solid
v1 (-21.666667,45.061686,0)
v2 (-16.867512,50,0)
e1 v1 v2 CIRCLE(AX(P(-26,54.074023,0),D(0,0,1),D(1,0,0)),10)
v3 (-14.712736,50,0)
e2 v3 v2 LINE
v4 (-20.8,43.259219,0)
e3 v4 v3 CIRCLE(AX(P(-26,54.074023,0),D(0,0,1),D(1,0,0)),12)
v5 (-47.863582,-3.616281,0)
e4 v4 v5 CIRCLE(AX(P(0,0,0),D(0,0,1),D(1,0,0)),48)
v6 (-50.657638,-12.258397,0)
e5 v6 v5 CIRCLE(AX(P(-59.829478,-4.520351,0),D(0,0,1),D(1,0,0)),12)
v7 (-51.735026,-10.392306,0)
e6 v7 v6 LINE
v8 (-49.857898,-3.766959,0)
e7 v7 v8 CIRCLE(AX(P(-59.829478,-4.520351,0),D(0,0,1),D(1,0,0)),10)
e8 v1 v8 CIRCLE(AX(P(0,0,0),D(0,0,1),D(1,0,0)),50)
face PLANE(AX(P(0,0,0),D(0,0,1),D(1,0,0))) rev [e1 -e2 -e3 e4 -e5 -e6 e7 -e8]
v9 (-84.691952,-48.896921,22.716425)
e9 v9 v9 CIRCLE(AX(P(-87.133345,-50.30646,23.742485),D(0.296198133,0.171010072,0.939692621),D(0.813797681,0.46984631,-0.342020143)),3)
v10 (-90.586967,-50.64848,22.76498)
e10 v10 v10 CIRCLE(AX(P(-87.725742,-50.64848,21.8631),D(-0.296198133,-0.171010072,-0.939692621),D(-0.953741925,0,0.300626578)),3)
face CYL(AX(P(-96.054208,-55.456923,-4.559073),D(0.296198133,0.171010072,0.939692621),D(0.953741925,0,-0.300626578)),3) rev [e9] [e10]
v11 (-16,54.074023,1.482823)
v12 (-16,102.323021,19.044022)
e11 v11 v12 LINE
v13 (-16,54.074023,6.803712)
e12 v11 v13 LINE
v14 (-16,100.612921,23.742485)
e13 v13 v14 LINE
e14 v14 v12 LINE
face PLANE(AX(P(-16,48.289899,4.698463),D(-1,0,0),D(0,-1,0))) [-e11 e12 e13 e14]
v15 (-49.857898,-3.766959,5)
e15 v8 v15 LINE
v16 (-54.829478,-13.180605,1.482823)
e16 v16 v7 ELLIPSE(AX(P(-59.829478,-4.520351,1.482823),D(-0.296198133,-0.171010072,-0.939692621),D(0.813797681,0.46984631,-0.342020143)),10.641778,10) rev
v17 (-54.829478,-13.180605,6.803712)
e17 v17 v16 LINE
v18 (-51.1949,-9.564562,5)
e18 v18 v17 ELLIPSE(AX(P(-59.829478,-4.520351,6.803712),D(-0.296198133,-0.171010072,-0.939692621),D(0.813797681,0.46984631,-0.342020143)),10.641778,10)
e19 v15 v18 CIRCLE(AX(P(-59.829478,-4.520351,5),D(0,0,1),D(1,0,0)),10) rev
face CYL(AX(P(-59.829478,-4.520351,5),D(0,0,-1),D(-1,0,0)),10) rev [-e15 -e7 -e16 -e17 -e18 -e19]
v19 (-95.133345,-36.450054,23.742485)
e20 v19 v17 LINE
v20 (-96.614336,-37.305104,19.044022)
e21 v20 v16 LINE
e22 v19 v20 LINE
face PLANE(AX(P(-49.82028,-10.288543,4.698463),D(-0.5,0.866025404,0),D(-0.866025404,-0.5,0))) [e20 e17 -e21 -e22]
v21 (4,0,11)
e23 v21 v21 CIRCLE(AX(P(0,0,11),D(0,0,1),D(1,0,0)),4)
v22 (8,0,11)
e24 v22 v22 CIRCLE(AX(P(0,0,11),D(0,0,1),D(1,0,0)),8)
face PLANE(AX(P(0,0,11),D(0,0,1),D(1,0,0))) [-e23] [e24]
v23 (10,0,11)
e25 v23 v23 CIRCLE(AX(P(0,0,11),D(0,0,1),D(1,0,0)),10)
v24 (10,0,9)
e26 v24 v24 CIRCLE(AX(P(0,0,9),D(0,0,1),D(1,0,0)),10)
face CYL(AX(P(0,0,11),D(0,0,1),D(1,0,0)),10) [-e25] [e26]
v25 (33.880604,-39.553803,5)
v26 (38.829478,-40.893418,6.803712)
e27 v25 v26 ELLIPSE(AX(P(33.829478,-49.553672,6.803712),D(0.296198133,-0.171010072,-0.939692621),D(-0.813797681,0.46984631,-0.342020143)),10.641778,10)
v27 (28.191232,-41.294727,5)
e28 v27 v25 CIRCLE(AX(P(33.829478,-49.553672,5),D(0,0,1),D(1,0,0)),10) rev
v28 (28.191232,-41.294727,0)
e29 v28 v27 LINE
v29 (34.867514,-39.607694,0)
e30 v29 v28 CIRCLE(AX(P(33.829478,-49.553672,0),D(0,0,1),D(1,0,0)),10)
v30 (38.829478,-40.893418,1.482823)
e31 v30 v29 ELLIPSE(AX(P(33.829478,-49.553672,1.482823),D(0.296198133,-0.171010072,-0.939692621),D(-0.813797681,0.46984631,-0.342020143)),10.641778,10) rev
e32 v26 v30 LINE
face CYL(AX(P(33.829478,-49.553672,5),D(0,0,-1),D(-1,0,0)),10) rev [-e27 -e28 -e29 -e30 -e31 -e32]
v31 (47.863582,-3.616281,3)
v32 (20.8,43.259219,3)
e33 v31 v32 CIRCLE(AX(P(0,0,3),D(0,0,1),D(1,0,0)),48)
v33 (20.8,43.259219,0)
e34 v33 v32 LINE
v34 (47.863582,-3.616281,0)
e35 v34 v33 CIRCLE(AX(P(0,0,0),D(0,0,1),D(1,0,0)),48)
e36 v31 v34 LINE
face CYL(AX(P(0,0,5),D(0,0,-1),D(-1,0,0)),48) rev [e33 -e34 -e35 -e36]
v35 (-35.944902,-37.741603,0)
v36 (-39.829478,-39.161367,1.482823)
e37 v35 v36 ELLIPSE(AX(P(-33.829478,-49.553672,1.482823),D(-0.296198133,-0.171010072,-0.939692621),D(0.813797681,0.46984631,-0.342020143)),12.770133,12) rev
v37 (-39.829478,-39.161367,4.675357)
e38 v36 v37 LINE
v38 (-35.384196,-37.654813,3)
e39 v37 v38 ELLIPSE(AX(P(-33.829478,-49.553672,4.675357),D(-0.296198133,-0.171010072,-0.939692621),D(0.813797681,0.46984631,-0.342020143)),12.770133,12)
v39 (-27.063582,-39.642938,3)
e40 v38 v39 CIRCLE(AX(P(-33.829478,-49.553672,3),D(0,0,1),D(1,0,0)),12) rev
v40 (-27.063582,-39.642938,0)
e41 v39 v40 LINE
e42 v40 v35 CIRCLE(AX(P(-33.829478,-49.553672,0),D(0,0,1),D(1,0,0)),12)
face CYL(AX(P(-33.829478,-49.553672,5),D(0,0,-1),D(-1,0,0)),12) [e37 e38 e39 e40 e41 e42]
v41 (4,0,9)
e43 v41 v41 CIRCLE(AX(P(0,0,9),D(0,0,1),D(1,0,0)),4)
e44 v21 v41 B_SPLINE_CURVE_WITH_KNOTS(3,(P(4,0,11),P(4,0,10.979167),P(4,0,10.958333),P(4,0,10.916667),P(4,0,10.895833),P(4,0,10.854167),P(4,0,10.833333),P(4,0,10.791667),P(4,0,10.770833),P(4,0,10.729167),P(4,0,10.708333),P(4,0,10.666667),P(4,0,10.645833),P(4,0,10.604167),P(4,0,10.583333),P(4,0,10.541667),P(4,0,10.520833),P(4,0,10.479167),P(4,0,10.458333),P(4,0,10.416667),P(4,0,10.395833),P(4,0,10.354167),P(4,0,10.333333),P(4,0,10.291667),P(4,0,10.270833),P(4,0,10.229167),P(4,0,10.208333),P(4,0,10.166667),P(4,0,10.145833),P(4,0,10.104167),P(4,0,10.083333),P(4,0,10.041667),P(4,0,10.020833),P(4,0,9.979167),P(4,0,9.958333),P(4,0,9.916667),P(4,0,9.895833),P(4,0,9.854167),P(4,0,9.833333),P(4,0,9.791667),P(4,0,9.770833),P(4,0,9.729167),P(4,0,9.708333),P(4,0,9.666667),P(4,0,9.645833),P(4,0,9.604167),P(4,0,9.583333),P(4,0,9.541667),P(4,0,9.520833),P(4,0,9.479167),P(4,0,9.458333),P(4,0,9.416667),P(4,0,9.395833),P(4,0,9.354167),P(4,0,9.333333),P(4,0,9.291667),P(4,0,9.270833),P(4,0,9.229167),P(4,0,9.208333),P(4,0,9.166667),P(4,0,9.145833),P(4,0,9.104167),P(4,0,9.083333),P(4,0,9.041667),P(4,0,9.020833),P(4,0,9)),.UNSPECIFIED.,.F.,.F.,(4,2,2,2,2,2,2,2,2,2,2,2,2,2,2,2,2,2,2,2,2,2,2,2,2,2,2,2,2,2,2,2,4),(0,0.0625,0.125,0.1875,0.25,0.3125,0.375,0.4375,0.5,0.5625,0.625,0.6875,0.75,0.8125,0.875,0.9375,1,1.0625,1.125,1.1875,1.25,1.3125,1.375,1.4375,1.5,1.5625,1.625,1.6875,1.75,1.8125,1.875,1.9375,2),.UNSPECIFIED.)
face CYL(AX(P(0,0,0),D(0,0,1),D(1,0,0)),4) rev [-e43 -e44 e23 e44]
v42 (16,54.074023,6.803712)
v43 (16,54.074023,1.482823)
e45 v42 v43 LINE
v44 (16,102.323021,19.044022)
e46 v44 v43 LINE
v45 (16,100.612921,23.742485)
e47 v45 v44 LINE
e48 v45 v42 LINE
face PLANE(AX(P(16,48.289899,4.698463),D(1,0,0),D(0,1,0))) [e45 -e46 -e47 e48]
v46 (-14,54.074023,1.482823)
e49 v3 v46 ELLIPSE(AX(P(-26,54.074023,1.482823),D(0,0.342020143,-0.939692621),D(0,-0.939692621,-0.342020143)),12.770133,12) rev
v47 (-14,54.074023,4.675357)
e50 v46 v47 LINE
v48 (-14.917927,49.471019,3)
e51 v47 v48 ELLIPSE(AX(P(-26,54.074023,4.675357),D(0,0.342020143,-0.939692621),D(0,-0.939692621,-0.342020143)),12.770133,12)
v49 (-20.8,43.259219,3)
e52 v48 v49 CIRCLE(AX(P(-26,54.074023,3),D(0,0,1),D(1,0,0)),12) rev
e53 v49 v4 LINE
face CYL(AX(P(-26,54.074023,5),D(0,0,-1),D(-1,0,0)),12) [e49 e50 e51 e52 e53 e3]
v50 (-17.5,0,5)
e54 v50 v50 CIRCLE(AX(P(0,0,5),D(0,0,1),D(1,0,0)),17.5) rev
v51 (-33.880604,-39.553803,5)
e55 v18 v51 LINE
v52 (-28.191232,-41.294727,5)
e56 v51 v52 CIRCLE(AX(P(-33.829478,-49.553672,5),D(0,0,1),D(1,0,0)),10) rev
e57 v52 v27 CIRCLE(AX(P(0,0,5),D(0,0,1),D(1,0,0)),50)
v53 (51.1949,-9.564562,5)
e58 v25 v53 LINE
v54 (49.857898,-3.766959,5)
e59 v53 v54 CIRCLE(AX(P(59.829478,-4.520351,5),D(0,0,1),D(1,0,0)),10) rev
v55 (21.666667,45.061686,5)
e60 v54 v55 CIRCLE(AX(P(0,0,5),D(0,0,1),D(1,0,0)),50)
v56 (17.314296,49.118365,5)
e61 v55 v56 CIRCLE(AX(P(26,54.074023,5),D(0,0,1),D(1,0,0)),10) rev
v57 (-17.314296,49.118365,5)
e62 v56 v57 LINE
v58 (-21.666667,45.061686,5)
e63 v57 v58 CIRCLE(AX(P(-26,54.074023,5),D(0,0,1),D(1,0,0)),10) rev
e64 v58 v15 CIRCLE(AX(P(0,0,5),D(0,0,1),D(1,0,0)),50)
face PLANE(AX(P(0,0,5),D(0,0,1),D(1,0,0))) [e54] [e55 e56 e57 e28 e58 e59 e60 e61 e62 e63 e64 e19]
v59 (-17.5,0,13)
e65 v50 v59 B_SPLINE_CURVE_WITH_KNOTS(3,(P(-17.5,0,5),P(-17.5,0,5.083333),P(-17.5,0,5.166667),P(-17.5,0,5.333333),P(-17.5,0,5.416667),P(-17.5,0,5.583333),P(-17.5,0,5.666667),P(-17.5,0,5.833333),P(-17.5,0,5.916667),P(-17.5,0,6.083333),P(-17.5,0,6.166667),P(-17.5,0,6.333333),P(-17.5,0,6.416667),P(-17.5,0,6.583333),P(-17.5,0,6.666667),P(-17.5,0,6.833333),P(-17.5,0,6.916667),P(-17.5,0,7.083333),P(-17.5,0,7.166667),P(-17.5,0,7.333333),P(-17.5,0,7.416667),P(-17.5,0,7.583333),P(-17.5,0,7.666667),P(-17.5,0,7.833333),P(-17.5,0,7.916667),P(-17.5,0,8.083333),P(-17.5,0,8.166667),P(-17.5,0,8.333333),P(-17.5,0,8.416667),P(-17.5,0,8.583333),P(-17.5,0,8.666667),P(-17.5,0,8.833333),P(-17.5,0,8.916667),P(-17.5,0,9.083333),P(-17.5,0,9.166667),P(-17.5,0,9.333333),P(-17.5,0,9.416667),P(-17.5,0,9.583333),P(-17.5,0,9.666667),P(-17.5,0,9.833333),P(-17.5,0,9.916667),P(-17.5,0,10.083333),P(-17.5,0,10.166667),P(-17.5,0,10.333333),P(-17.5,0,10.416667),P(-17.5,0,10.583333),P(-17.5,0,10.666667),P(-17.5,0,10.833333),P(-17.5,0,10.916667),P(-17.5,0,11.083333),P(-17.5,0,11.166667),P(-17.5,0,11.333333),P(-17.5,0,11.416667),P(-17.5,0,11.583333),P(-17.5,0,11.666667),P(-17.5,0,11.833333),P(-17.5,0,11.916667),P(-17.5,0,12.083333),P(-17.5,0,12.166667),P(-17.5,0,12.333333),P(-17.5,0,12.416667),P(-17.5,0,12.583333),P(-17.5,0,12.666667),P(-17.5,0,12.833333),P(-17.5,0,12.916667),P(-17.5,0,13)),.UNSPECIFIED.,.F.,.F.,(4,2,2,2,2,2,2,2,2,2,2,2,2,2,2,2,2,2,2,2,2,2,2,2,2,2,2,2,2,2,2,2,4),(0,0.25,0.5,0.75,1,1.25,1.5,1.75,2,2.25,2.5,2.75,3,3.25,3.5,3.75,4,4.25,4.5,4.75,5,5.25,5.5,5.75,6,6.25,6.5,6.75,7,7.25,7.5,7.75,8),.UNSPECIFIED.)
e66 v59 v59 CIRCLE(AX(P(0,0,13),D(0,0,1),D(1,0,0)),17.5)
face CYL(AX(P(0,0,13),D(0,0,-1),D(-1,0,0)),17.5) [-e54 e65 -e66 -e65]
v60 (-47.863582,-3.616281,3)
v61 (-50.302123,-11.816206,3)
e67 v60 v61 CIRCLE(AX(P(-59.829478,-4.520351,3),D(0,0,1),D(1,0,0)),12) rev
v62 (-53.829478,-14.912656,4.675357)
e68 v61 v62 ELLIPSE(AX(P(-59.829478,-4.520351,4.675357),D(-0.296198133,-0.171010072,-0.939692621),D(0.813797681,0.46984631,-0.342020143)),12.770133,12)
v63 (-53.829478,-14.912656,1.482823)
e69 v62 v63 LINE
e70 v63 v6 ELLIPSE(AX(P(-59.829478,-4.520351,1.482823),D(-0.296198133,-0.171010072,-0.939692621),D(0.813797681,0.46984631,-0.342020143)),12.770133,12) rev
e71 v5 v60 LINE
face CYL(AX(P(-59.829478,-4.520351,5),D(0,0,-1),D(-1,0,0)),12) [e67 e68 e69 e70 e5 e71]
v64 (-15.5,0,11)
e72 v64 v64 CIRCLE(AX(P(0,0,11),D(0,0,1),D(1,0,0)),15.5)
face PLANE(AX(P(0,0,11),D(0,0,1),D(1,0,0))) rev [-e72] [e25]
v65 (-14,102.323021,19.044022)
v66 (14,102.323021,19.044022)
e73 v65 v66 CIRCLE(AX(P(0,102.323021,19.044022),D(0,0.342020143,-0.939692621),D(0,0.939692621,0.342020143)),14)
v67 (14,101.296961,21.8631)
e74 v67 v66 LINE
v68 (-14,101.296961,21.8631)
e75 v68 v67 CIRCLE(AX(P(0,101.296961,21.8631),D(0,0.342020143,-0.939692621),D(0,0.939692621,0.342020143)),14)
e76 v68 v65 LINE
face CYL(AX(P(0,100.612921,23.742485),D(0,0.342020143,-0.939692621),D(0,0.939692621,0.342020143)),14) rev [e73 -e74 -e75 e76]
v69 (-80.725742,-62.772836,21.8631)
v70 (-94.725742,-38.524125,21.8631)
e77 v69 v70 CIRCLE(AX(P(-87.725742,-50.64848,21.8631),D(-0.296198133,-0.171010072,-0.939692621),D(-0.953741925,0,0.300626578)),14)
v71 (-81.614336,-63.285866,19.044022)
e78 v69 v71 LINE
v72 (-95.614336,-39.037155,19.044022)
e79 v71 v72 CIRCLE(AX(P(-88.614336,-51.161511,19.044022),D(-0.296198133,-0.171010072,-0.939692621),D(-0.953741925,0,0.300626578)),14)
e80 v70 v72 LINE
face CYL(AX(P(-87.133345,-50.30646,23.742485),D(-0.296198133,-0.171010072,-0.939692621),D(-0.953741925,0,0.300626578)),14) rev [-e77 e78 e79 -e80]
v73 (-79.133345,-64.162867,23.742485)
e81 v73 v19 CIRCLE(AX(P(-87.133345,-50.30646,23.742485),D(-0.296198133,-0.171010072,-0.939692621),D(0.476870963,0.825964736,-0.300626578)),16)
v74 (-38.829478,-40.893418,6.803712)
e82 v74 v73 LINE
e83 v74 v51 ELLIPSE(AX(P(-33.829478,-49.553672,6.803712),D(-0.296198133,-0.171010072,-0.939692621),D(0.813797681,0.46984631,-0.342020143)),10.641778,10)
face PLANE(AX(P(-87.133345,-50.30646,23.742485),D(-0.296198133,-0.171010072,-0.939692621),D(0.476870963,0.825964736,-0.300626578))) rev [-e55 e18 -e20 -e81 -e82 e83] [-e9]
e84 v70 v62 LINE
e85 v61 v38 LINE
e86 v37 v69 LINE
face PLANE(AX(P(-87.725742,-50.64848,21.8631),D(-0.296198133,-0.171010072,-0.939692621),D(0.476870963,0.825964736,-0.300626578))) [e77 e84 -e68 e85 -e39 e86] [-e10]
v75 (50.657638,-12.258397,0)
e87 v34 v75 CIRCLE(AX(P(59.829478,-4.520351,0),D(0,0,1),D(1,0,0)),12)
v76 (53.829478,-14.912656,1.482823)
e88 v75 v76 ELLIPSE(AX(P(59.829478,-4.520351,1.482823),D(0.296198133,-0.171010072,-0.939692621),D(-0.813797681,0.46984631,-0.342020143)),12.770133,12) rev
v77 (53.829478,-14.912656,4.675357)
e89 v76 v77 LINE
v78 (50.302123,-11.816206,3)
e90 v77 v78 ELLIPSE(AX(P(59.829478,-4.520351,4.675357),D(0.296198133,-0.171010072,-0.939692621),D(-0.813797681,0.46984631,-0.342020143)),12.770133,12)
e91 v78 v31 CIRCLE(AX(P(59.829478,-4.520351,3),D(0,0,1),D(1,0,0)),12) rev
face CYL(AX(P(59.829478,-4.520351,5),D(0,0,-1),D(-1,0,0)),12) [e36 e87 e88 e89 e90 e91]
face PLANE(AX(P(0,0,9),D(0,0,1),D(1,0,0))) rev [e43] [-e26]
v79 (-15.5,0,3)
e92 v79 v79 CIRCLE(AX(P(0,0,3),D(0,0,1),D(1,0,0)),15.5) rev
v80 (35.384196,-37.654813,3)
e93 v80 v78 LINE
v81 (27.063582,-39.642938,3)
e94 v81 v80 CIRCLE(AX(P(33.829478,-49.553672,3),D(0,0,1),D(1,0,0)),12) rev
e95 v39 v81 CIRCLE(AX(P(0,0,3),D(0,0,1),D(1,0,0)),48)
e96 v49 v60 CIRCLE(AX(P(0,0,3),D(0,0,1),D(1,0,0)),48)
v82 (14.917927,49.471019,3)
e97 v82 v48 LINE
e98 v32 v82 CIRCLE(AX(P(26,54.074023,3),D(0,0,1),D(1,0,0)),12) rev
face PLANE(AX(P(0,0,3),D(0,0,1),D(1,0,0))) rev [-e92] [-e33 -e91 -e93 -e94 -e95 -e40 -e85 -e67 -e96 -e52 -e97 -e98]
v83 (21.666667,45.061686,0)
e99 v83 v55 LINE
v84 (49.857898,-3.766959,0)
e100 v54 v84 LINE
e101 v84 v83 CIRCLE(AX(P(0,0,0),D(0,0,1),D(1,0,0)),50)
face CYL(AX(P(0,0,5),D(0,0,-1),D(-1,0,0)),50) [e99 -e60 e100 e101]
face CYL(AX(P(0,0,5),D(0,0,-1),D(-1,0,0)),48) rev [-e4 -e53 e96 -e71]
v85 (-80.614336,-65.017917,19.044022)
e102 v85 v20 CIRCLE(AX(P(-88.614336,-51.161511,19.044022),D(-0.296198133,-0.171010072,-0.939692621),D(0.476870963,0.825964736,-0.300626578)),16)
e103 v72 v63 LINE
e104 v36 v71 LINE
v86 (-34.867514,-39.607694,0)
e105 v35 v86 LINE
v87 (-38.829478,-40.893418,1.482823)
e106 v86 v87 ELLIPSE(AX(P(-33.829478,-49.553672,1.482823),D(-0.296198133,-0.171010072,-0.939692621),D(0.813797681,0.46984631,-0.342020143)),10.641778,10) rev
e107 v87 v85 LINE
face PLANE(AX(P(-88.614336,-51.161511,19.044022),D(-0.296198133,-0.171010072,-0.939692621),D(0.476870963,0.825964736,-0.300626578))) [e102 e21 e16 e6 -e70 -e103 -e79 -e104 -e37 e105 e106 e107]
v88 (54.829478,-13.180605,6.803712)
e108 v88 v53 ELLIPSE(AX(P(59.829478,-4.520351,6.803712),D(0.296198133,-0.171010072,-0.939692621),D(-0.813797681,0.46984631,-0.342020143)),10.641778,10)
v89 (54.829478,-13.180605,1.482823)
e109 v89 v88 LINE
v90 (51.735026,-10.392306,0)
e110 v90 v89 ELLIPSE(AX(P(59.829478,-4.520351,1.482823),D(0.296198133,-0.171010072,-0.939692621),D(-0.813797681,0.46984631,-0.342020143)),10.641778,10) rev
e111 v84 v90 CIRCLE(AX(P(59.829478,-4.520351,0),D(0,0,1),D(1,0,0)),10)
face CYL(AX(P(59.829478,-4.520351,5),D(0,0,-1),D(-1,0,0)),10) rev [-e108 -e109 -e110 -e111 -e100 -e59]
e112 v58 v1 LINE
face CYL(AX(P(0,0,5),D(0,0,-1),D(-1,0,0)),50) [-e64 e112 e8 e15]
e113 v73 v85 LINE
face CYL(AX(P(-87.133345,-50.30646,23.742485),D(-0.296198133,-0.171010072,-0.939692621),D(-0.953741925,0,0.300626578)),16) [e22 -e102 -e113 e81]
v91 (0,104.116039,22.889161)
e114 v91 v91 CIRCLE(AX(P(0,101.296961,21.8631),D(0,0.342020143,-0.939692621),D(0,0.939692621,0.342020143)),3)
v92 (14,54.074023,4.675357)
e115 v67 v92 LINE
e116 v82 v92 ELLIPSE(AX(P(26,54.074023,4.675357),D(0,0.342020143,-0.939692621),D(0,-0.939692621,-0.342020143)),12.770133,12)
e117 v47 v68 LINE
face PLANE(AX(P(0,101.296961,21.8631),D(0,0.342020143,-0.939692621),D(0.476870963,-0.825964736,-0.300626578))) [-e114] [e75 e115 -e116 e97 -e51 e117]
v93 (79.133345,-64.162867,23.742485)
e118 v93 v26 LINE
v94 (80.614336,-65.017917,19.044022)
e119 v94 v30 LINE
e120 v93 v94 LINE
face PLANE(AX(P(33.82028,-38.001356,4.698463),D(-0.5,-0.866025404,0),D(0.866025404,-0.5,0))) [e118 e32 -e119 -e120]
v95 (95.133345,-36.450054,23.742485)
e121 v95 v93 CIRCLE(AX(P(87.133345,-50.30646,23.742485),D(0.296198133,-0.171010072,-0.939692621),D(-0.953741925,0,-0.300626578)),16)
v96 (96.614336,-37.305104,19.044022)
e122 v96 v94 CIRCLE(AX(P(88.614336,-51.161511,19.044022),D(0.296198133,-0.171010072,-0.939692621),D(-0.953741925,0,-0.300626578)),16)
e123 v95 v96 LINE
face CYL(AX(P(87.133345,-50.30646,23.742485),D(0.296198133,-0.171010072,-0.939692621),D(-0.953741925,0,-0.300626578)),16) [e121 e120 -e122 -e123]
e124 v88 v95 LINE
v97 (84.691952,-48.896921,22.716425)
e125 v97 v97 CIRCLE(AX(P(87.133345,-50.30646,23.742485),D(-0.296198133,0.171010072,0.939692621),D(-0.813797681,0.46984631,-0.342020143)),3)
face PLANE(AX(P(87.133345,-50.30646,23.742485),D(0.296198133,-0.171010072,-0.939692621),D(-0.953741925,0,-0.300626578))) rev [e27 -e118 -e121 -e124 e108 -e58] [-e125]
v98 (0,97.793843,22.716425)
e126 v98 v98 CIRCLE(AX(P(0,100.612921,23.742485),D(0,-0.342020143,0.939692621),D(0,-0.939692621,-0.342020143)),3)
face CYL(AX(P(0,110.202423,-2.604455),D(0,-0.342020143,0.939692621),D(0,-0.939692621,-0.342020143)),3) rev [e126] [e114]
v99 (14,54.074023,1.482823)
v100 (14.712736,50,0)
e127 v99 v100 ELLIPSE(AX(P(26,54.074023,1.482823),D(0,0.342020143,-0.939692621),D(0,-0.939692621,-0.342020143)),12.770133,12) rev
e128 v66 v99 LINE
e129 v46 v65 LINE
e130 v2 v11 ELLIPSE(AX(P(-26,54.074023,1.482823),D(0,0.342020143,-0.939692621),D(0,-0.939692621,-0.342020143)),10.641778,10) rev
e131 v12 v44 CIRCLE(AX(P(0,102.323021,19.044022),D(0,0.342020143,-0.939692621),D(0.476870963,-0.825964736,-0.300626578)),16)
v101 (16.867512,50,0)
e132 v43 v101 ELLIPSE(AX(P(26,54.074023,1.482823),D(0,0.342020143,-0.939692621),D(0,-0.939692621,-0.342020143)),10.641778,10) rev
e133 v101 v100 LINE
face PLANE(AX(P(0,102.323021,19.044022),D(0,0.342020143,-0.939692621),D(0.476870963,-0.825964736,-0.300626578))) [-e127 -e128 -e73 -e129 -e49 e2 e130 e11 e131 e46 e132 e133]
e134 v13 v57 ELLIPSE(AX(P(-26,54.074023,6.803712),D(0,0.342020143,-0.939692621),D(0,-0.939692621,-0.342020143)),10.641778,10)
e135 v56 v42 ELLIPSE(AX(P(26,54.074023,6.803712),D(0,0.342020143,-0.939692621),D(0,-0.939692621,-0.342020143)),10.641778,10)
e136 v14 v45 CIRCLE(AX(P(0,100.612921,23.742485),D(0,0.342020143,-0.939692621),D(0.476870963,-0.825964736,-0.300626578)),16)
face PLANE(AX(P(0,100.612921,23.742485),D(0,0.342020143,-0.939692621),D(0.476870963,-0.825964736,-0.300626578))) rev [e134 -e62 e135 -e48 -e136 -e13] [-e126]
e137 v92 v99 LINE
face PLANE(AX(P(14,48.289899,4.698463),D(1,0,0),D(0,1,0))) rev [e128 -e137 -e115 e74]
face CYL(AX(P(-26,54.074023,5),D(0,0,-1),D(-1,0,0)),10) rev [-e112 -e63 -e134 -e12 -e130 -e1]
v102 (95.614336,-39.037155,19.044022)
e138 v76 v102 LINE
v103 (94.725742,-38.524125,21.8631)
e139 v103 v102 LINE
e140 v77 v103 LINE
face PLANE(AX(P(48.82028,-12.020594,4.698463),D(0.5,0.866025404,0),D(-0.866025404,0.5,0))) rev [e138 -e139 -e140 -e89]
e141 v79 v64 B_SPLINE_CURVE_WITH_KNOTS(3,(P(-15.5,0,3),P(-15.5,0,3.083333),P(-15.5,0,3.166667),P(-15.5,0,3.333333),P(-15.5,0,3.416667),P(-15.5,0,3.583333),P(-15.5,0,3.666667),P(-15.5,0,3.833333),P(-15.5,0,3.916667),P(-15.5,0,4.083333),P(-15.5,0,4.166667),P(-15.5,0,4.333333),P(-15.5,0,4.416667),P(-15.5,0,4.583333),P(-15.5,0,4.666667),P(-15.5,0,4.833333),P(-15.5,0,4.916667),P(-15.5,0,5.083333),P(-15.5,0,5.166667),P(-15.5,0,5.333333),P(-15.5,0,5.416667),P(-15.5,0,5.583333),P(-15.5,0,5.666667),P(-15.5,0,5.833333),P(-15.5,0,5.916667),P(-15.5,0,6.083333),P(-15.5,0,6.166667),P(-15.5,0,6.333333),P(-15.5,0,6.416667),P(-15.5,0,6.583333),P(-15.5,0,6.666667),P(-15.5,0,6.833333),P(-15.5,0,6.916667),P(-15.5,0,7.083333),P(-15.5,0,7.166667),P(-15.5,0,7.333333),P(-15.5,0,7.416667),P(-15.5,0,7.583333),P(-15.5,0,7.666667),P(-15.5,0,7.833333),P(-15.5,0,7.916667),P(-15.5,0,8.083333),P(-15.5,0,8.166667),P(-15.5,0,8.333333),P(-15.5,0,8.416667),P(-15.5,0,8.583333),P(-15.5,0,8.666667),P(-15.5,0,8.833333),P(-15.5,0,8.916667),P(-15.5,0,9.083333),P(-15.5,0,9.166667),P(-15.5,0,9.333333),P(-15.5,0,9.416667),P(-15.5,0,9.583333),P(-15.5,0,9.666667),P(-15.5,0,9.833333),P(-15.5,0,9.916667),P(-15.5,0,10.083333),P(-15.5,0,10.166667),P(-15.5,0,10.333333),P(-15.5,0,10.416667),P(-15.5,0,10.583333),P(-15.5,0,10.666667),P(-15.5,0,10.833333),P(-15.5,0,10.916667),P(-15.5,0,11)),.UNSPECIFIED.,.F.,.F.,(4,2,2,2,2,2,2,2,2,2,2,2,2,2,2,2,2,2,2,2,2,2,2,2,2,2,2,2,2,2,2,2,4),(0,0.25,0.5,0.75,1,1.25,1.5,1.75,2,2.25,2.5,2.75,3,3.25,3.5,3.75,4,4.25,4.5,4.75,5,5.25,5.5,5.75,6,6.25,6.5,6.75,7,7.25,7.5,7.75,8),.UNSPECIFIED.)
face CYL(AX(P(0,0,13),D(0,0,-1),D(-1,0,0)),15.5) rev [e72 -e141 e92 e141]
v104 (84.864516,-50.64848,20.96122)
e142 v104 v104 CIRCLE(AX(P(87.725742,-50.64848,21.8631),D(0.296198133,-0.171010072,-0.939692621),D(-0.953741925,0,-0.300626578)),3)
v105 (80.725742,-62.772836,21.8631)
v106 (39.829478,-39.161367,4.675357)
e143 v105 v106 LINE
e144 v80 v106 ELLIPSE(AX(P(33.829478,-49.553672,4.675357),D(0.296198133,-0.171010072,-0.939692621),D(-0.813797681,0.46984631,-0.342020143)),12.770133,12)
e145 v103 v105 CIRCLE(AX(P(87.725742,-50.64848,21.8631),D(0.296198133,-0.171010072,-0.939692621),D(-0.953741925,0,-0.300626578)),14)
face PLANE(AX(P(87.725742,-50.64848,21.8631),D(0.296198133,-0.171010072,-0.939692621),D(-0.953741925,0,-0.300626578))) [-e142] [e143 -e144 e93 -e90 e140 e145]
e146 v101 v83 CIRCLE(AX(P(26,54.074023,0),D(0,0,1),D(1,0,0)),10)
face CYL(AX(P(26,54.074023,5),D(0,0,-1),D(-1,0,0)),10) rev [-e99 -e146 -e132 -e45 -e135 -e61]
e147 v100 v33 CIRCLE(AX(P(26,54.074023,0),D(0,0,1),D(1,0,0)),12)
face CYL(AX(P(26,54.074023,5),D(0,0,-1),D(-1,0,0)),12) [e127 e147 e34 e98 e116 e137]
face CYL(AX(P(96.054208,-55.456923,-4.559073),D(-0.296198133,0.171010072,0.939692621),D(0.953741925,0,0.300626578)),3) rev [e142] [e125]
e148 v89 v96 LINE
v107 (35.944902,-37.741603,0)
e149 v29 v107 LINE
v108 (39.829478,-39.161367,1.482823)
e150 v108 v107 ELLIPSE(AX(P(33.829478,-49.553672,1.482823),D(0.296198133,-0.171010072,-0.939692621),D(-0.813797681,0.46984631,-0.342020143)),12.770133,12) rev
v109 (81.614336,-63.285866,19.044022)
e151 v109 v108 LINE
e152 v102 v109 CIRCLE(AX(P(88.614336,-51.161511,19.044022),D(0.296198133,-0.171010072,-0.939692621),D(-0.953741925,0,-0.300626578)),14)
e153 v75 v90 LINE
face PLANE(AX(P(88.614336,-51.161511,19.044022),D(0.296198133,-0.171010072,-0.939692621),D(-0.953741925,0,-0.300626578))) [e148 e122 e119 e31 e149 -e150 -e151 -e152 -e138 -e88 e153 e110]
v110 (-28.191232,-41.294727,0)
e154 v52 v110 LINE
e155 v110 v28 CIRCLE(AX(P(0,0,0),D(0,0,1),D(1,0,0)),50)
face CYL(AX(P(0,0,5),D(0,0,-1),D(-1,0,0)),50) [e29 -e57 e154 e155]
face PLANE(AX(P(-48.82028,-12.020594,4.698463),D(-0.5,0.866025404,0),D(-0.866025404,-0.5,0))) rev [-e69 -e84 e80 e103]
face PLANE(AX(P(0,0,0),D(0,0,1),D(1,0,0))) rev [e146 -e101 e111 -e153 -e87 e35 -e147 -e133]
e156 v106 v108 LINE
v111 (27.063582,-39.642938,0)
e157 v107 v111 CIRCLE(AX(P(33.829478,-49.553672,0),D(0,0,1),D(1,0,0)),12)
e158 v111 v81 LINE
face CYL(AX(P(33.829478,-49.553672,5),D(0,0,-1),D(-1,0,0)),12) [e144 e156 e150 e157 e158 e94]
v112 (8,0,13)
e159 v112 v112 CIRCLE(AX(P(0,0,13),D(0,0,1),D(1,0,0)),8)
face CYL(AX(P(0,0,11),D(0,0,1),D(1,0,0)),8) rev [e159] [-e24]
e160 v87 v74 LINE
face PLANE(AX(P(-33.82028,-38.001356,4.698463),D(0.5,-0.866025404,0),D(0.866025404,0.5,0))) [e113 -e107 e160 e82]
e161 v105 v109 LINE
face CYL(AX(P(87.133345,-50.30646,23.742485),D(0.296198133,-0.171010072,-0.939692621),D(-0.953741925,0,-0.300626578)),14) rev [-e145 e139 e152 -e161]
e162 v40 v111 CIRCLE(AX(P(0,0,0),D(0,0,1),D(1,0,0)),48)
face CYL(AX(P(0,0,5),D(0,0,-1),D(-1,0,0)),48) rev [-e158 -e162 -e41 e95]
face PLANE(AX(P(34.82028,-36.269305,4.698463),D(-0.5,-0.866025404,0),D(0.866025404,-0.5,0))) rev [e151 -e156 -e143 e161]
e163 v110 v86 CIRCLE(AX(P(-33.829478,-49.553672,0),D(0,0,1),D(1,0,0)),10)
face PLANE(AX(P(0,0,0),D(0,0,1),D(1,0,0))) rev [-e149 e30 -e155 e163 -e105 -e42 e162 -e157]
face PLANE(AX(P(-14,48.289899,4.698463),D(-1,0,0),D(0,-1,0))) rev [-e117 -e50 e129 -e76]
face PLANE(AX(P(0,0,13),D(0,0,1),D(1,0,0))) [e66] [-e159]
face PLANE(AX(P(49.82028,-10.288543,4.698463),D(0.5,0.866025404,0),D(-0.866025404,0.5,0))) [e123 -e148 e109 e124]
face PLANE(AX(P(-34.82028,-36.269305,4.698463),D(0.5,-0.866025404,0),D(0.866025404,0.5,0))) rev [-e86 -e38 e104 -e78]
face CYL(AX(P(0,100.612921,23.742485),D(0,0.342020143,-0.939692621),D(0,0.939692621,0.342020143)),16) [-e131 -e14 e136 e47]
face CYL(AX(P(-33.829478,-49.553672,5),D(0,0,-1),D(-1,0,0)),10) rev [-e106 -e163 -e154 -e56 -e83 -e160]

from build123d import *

# Parameters (mm, degrees)
SKETCH_1_R                       = 50
EXTRUDE_1_DEPTH                  = 5
SKETCH_1_3_R                     = 17.500000000000004
EXTRUDE_2_DEPTH                  = 13
SKETCH_2_R                       = 8
CUT_EXTRUDE_1_DEPTH              = 2
EXTRUDE_3_DEPTH                  = 5
EXTRUDE_5_REACH                  = 128.152
CUT_EXTRUDE_2_DEPTH              = 118.90068634817568
FILLET_5_R                       = 10
PATTERN_CIRCULAR_5_COUNT         = 3
FILLET_5_OF_PATTERN_CIRCULAR_5_R = 10
SHELL_1_T                        = -2
SKETCH_6_R                       = 3.000000000000001
CUT_EXTRUDE_3_DEPTH              = 159.93487100427444
PATTERN_CIRCULAR_6_COUNT         = 3
SKETCH_7_R                       = 4
CUT_EXTRUDE_4_DEPTH              = 158.79466820588078


with BuildPart() as part:
    # 草图1 → 凸台-拉伸1 (new body)
    with BuildSketch(Plane.XY):
        Circle(SKETCH_1_R)
    extrude(amount=EXTRUDE_1_DEPTH)

    # 草图1<3> → 凸台-拉伸2 (add)
    with BuildSketch(Plane.XY):
        with Locations(Location((0, 0, 0), (0, 0, 180))):
            Circle(SKETCH_1_3_R)
    extrude(amount=EXTRUDE_2_DEPTH)

    # 草图2 → 切除-拉伸1 (cut)
    with BuildSketch(Plane.XY.offset(13)):
        Circle(SKETCH_2_R)
    extrude(amount=-CUT_EXTRUDE_1_DEPTH, mode=Mode.SUBTRACT)

    # 草图3 → 凸台-拉伸3 (add)
    with BuildSketch(Plane(origin=(5.065286390387326, -2.9244444610127034, -16.069690242163254), x_dir=(-0.4547694655894244, 0.8399115425669119, -0.296198132726018), z_dir=(0.2961981327260181, -0.17101007166283297, -0.9396926207859104))):
        with BuildLine():
            Line((-48.68988406746872, 9.635909059096992), (-44.170713707432306, 7.026764835216193))
            Line((-44.170713707432306, 7.026764835216193), (-28.17071370743221, 34.73957775631811))
            Line((-28.17071370743221, 34.73957775631811), (-32.68988406746857, 37.348721980198945))
            Line((-32.68988406746857, 37.348721980198945), (-80.91104144309439, 65.18922017165217))
            ThreePointArc((-80.91104144309439, 65.18922017165217), (-102.76744790364546, 59.33281371110126), (-96.91104144309453, 37.47640725055021))
            Line((-96.91104144309453, 37.47640725055021), (-48.68988406746872, 9.635909059096992))
        make_face()
    extrude_3 = extrude(amount=-EXTRUDE_3_DEPTH)

    # 凸台-拉伸5: up to this face of the body (flat: up to its plane)
    extrude_5_end = Plane(part.part.faces().sort_by_distance((41.313007094, -23.852075767, 5))[0])
    # 草图3<3> → 凸台-拉伸5 (add, up to the picked face)
    with BuildSketch(Plane(origin=(5.065286390387326, -2.9244444610127034, -16.069690242163254), x_dir=(-0.4547694655894244, 0.8399115425669119, -0.296198132726018), z_dir=(0.2961981327260181, -0.17101007166283297, -0.9396926207859104)), mode=Mode.PRIVATE) as extrude_5_sk1:
        with BuildLine():
            Line((-48.68988406746872, 9.635909059096992), (-44.170713707432306, 7.026764835216193))
            Line((-44.170713707432306, 7.026764835216193), (-28.17071370743221, 34.73957775631811))
            Line((-28.17071370743221, 34.73957775631811), (-32.68988406746857, 37.348721980198945))
            Line((-32.68988406746857, 37.348721980198945), (-80.91104144309439, 65.18922017165217))
            ThreePointArc((-80.91104144309439, 65.18922017165217), (-102.76744790364546, 59.33281371110126), (-96.91104144309453, 37.47640725055021))
            Line((-96.91104144309453, 37.47640725055021), (-48.68988406746872, 9.635909059096992))
        make_face()
    extrude_5_tool1 = split(extrude(extrude_5_sk1.sketch, amount=-EXTRUDE_5_REACH, mode=Mode.PRIVATE), bisect_by=extrude_5_end, keep=Keep.BOTH, mode=Mode.PRIVATE)
    extrude_5 = extrude_5_tool1.solids().sort_by(Axis((69.018363, -39.847771, 10.808293), (-0.2961981327260181, 0.17101007166283297, 0.9396926207859104)))[0]
    add(extrude_5)

    # 草图5 → 切除-拉伸2 (cut, through all)
    with BuildSketch(Plane(origin=(38.49206954203913, -22.223406711762383, -1.6037e-13), x_dir=(-3.05e-15, 1.78e-15, -1), z_dir=(0.8660254037844358, -0.5000000000000049, -3.5322521134775243e-15))):
        Polygon((-1.648e-13, 16.000000000000025), (-1.5959e-13, -15.999999999999938), (1.784759762817917, -15.999999999999941), (1.7847597628179104, 16.00000000000001), align=None)
    cut_extrude_2 = extrude(amount=CUT_EXTRUDE_2_DEPTH, mode=Mode.SUBTRACT)

    # 圆角5
    # the kernel refuses this fillet: 10 mm, written as the material it adds along each edge
    with BuildSketch(Plane(origin=(49.02438299353199, -9.829032104103193, 21.757865522686952), x_dir=(0.13621517176222497, 0.9906792755386516, 2.0677653492524378e-13), z_dir=(-1.421e-14, 2.1068e-13, -1))) as fillet_5_piece_1_section:
        with BuildLine():
            CenterArc((6.731018039103729, 9.981260704815702), FILLET_5_R, 202.17110675219934, 64.32071138054346)
            Line((-2.5295920158997607, 6.207522318391934), (0, 0))
            ThreePointArc((0, 0), (3.059553654138056, 0.09369647592149925), (6.119107308276114, -4e-17))
        make_face()
    fillet_5_piece_1 = extrude(amount=21.757865522686952, mode=Mode.PRIVATE)
    fillet_5_piece_1 = split(fillet_5_piece_1, bisect_by=Plane(origin=(52.84730831811883, -11.940665679476957, 5), z_dir=(0, 0, 1)), keep=Keep.TOP, mode=Mode.PRIVATE)
    fillet_5_piece_1 = split(fillet_5_piece_1, bisect_by=Plane(origin=(52.714644452393756, -11.864072160888846, 5.897511373073815), z_dir=(0.2961981327260181, -0.17101007166283302, -0.9396926207859104)), keep=Keep.TOP, mode=Mode.PRIVATE)
    add(fillet_5_piece_1)
    with BuildSketch(Plane(origin=(49.02438299353206, -9.829032104104291, 5), x_dir=(0.13621517176219033, 0.9906792755386564, 2.067765349252453e-13), z_dir=(-1.421e-14, 2.1068e-13, -1))) as fillet_5_piece_2_section:
        with BuildLine():
            CenterArc((6.731018039104405, 9.981260704815725), FILLET_5_R, 202.17110675220147, 64.32071138054334)
            Line((-2.5295920158989453, 6.20752231839161), (0, 0))
            ThreePointArc((0, 0), (3.059553654138554, 0.09369647592138662), (6.119107308277147, 7e-17))
        make_face()
    fillet_5_piece_2 = extrude(amount=5, mode=Mode.PRIVATE)
    fillet_5_piece_2 = split(fillet_5_piece_2, bisect_by=Plane(origin=(49.82758960271088, -7.64578575322723, 4.219824774764975), z_dir=(-0.2961981327260181, 0.17101007166283302, 0.9396926207859104)), keep=Keep.TOP, mode=Mode.PRIVATE)
    add(fillet_5_piece_2)
    with BuildSketch(Plane(origin=(49.02438299353206, -9.829032104104291, 5), x_dir=(0.13621517176219033, 0.9906792755386564, 2.067765349252453e-13), z_dir=(-1.421e-14, 2.1068e-13, -1))) as fillet_5_piece_3_section:
        with BuildLine():
            CenterArc((6.731018039104405, 9.981260704815725), FILLET_5_R, 202.17110675220147, 64.32071138054334)
            Line((-2.5295920158989453, 6.20752231839161), (0, 0))
            ThreePointArc((0, 0), (3.059553654138554, 0.09369647592138662), (6.119107308277147, 7e-17))
        make_face()
    fillet_5_piece_3 = extrude(amount=5, mode=Mode.PRIVATE)
    fillet_5_piece_3 = split(fillet_5_piece_3, bisect_by=Plane(origin=(51.376248958655296, -9.84493274720883, -0.2127030682430071), z_dir=(-0.2961981327260181, 0.17101007166283302, 0.9396926207859104)), keep=Keep.TOP, mode=Mode.PRIVATE)
    fillet_5_piece_3 = split(fillet_5_piece_3, bisect_by=Plane(origin=(49.8952582950252, -8.98988238889466, 4.485760035686546), z_dir=(0.2961981327260181, -0.17101007166283302, -0.9396926207859104)), keep=Keep.TOP, mode=Mode.PRIVATE)
    add(fillet_5_piece_3)
    with BuildSketch(Plane(origin=(33.02438299353184, -37.54184502520521, 0), x_dir=(-0.7898458337381293, -0.6133054368962657, 7.566603122460955e-14), z_dir=(6.821e-14, 3.553e-14, 1))) as fillet_5_piece_4_section:
        with BuildLine():
            CenterArc((6.731018039103674, 9.981260704815702), FILLET_5_R, 202.17110675219942, 64.32071138054346)
            Line((-2.529592015899812, 6.20752231839192), (0, 0))
            ThreePointArc((0, 0), (3.059553654138055, 0.0936964759214936), (6.119107308276071, -1.7e-16))
        make_face()
    fillet_5_piece_4 = extrude(amount=5, mode=Mode.PRIVATE)
    fillet_5_piece_4 = split(fillet_5_piece_4, bisect_by=Plane(origin=(32.73309567333404, -38.71562001742838, 4.485760035687541), z_dir=(0.2961981327260181, -0.17101007166283302, -0.9396926207859104)), keep=Keep.TOP, mode=Mode.PRIVATE)
    fillet_5_piece_4 = split(fillet_5_piece_4, bisect_by=Plane(origin=(34.21408633696413, -39.570670375742544, -0.21270306824201057), z_dir=(-0.2961981327260181, 0.17101007166283302, 0.9396926207859104)), keep=Keep.TOP, mode=Mode.PRIVATE)
    add(fillet_5_piece_4)
    with BuildSketch(Plane(origin=(33.02438299353184, -37.54184502520521, 0), x_dir=(-0.7898458337381293, -0.6133054368962657, 7.566603122460955e-14), z_dir=(6.821e-14, 3.553e-14, 1))) as fillet_5_piece_5_section:
        with BuildLine():
            CenterArc((6.731018039103674, 9.981260704815702), FILLET_5_R, 202.17110675219942, 64.32071138054346)
            Line((-2.529592015899812, 6.20752231839192), (0, 0))
            ThreePointArc((0, 0), (3.059553654138055, 0.0936964759214936), (6.119107308276071, -1.7e-16))
        make_face()
    fillet_5_piece_5 = extrude(amount=21.757865522687496, mode=Mode.PRIVATE)
    fillet_5_piece_5 = split(fillet_5_piece_5, bisect_by=Plane(origin=(36.764573975586906, -39.7967786853785, 5), z_dir=(0, 0, 1)), keep=Keep.TOP, mode=Mode.PRIVATE)
    fillet_5_piece_5 = split(fillet_5_piece_5, bisect_by=Plane(origin=(36.63191010986169, -39.720185166790316, 5.897511373074433), z_dir=(0.2961981327260181, -0.17101007166283302, -0.9396926207859104)), keep=Keep.TOP, mode=Mode.PRIVATE)
    add(fillet_5_piece_5)
    with BuildSketch(Plane(origin=(33.02438299353184, -37.54184502520521, 0), x_dir=(-0.7898458337381293, -0.6133054368962657, 7.566603122460955e-14), z_dir=(6.821e-14, 3.553e-14, 1))) as fillet_5_piece_6_section:
        with BuildLine():
            CenterArc((6.731018039103674, 9.981260704815702), FILLET_5_R, 202.17110675219942, 64.32071138054346)
            Line((-2.529592015899812, 6.20752231839192), (0, 0))
            ThreePointArc((0, 0), (3.059553654138055, 0.0936964759214936), (6.119107308276071, -1.7e-16))
        make_face()
    fillet_5_piece_6 = extrude(amount=5, mode=Mode.PRIVATE)
    fillet_5_piece_6 = split(fillet_5_piece_6, bisect_by=Plane(origin=(31.535239495546648, -39.3290655286776, 4.2198247747657565), z_dir=(-0.2961981327260181, 0.17101007166283302, 0.9396926207859104)), keep=Keep.TOP, mode=Mode.PRIVATE)
    add(fillet_5_piece_6)

    # 阵列(圆周)5: 凸台-拉伸3, 凸台-拉伸5, 切除-拉伸2 ×3 about axis
    pattern_circular_5_axis = Axis((-1.19e-15, 4.01e-15, 0), (0, 0, 1))
    add([extrude_3.rotate(pattern_circular_5_axis, i * 360 / PATTERN_CIRCULAR_5_COUNT) for i in range(1, PATTERN_CIRCULAR_5_COUNT)])
    add([extrude_5.rotate(pattern_circular_5_axis, i * 360 / PATTERN_CIRCULAR_5_COUNT) for i in range(1, PATTERN_CIRCULAR_5_COUNT)])
    add([cut_extrude_2.rotate(pattern_circular_5_axis, i * 360 / PATTERN_CIRCULAR_5_COUNT) for i in range(1, PATTERN_CIRCULAR_5_COUNT)], mode=Mode.SUBTRACT)

    # 圆角5 of 阵列(圆周)5
    # the kernel refuses this fillet: 10 mm, written as the material it adds along each edge
    with BuildSketch(Plane(origin=(-15.999999999999766, 47.37087712930813, 0), x_dir=(-0.9260610055003486, -0.37737383864237767, -1.556384909056303e-13), z_dir=(-1.3216e-13, -8.811e-14, 1))) as fillet_5_of_pattern_circular_5_piece_1_section:
        with BuildLine():
            CenterArc((6.731018039103714, -9.981260704815698), FILLET_5_OF_PATTERN_CIRCULAR_5_R, 93.5081818672572, 64.3207113805434)
            Line((-2.529592015899774, -6.207522318391922), (0, 0))
            ThreePointArc((0, 0), (3.0595536541380572, -0.09369647592149477), (6.119107308276103, -1e-17))
        make_face()
    fillet_5_of_pattern_circular_5_piece_1 = extrude(amount=5, mode=Mode.PRIVATE)
    fillet_5_of_pattern_circular_5_piece_1 = split(fillet_5_of_pattern_circular_5_piece_1, bisect_by=Plane(origin=(-17.162162621694545, 49.41560312295407, -0.21270306824287744), z_dir=(-1.7763568394002505e-15, -0.3420201433256631, 0.9396926207859105)), keep=Keep.TOP, mode=Mode.PRIVATE)
    fillet_5_of_pattern_circular_5_piece_1 = split(fillet_5_of_pattern_circular_5_piece_1, bisect_by=Plane(origin=(-17.162162621694556, 47.70550240632575, 4.485760035686674), z_dir=(1.7763568394002505e-15, 0.3420201433256631, -0.9396926207859105)), keep=Keep.TOP, mode=Mode.PRIVATE)
    add(fillet_5_of_pattern_circular_5_piece_1)
    with BuildSketch(Plane(origin=(-15.999999999999766, 47.37087712930813, 0), x_dir=(-0.9260610055003486, -0.37737383864237767, -1.556384909056303e-13), z_dir=(-1.3216e-13, -8.811e-14, 1))) as fillet_5_of_pattern_circular_5_piece_2_section:
        with BuildLine():
            CenterArc((6.731018039103714, -9.981260704815698), FILLET_5_OF_PATTERN_CIRCULAR_5_R, 93.5081818672572, 64.3207113805434)
            Line((-2.529592015899774, -6.207522318391922), (0, 0))
            ThreePointArc((0, 0), (3.0595536541380572, -0.09369647592149477), (6.119107308276103, -1e-17))
        make_face()
    fillet_5_of_pattern_circular_5_piece_2 = extrude(amount=21.75786552268825, mode=Mode.PRIVATE)
    fillet_5_of_pattern_circular_5_piece_2 = split(fillet_5_of_pattern_circular_5_piece_2, bisect_by=Plane(origin=(-16.08273434253529, 51.73744436485874, 5), z_dir=(0, 0, 1)), keep=Keep.TOP, mode=Mode.PRIVATE)
    fillet_5_of_pattern_circular_5_piece_2 = split(fillet_5_of_pattern_circular_5_piece_2, bisect_by=Plane(origin=(-16.082734342535286, 51.58425732768241, 5.897511373074018), z_dir=(1.7763568394002505e-15, 0.3420201433256631, -0.9396926207859105)), keep=Keep.TOP, mode=Mode.PRIVATE)
    add(fillet_5_of_pattern_circular_5_piece_2)
    with BuildSketch(Plane(origin=(-15.999999999999766, 47.37087712930813, 0), x_dir=(-0.9260610055003486, -0.37737383864237767, -1.556384909056303e-13), z_dir=(-1.3216e-13, -8.811e-14, 1))) as fillet_5_of_pattern_circular_5_piece_3_section:
        with BuildLine():
            CenterArc((6.731018039103714, -9.981260704815698), FILLET_5_OF_PATTERN_CIRCULAR_5_R, 93.5081818672572, 64.3207113805434)
            Line((-2.529592015899774, -6.207522318391922), (0, 0))
            ThreePointArc((0, 0), (3.0595536541380572, -0.09369647592149477), (6.119107308276103, -1e-17))
        make_face()
    fillet_5_of_pattern_circular_5_piece_3 = extrude(amount=5, mode=Mode.PRIVATE)
    fillet_5_of_pattern_circular_5_piece_3 = split(fillet_5_of_pattern_circular_5_piece_3, bisect_by=Plane(origin=(-18.29235010716722, 46.974851281906425, 4.219824774764913), z_dir=(-1.7763568394002505e-15, -0.3420201433256631, 0.9396926207859105)), keep=Keep.TOP, mode=Mode.PRIVATE)
    add(fillet_5_of_pattern_circular_5_piece_3)
    with BuildSketch(Plane(origin=(16.000000000000224, 47.37087712930797, 0), x_dir=(9.54e-15, 1, -1.4495e-13), z_dir=(-2.1458e-13, 1.4495e-13, 1))) as fillet_5_of_pattern_circular_5_piece_4_section:
        with BuildLine():
            CenterArc((6.703146209075082, -10), FILLET_5_OF_PATTERN_CIRCULAR_5_R, 89.99999999999997, 64.3207113805434)
            ThreePointArc((-2.309191013988783, -5.666666666666704), (-1.0678268542906946, -2.868691932119112), (0, 0))
            Line((0, 0), (6.703146209075086, 0))
        make_face()
    fillet_5_of_pattern_circular_5_piece_4 = extrude(amount=5, mode=Mode.PRIVATE)
    fillet_5_of_pattern_circular_5_piece_4 = split(fillet_5_of_pattern_circular_5_piece_4, bisect_by=Plane(origin=(17.162162621235485, 49.41560312244018, -0.2127030684298532), z_dir=(-1.7763568394002505e-15, -0.3420201433256631, 0.9396926207859105)), keep=Keep.TOP, mode=Mode.PRIVATE)
    fillet_5_of_pattern_circular_5_piece_4 = split(fillet_5_of_pattern_circular_5_piece_4, bisect_by=Plane(origin=(17.162162621235474, 47.70550240581186, 4.485760035499698), z_dir=(1.7763568394002505e-15, 0.3420201433256631, -0.9396926207859105)), keep=Keep.TOP, mode=Mode.PRIVATE)
    add(fillet_5_of_pattern_circular_5_piece_4)
    with BuildSketch(Plane(origin=(16.000000000000224, 47.37087712930797, 0), x_dir=(9.54e-15, 1, -1.4495e-13), z_dir=(-2.1458e-13, 1.4495e-13, 1))) as fillet_5_of_pattern_circular_5_piece_5_section:
        with BuildLine():
            CenterArc((6.703146209075082, -10), FILLET_5_OF_PATTERN_CIRCULAR_5_R, 89.99999999999997, 64.3207113805434)
            ThreePointArc((-2.309191013988783, -5.666666666666704), (-1.0678268542906946, -2.868691932119112), (0, 0))
            Line((0, 0), (6.703146209075086, 0))
        make_face()
    fillet_5_of_pattern_circular_5_piece_5 = extrude(amount=5, mode=Mode.PRIVATE)
    fillet_5_of_pattern_circular_5_piece_5 = split(fillet_5_of_pattern_circular_5_piece_5, bisect_by=Plane(origin=(18.292350106036324, 46.974851281356855, 4.219824774564952), z_dir=(-1.7763568394002505e-15, -0.3420201433256631, 0.9396926207859105)), keep=Keep.TOP, mode=Mode.PRIVATE)
    add(fillet_5_of_pattern_circular_5_piece_5)
    with BuildSketch(Plane(origin=(16.000000000000224, 47.37087712930797, 0), x_dir=(9.54e-15, 1, -1.4495e-13), z_dir=(-2.1458e-13, 1.4495e-13, 1))) as fillet_5_of_pattern_circular_5_piece_6_section:
        with BuildLine():
            CenterArc((6.703146209075082, -10), FILLET_5_OF_PATTERN_CIRCULAR_5_R, 89.99999999999997, 64.3207113805434)
            ThreePointArc((-2.309191013988783, -5.666666666666704), (-1.0678268542906946, -2.868691932119112), (0, 0))
            Line((0, 0), (6.703146209075086, 0))
        make_face()
    fillet_5_of_pattern_circular_5_piece_6 = extrude(amount=21.757865522686828, mode=Mode.PRIVATE)
    fillet_5_of_pattern_circular_5_piece_6 = split(fillet_5_of_pattern_circular_5_piece_6, bisect_by=Plane(origin=(16.082734343372024, 51.7374443634232, 5), z_dir=(0, 0, 1)), keep=Keep.TOP, mode=Mode.PRIVATE)
    fillet_5_of_pattern_circular_5_piece_6 = split(fillet_5_of_pattern_circular_5_piece_6, bisect_by=Plane(origin=(16.082734343372035, 51.58425732627241, 5.897511372560881), z_dir=(1.7763568394002505e-15, 0.3420201433256631, -0.9396926207859105)), keep=Keep.TOP, mode=Mode.PRIVATE)
    add(fillet_5_of_pattern_circular_5_piece_6)
    with BuildSketch(Plane(origin=(-33.024382993532214, -37.54184502520488, 21.757865522688395), x_dir=(0.7898458337381224, -0.6133054368962745, -1.9097417521666665e-13), z_dir=(-1.7337e-13, 8.811e-14, -1))) as fillet_5_of_pattern_circular_5_piece_7_section:
        with BuildLine():
            CenterArc((6.731018039103731, 9.981260704815696), FILLET_5_OF_PATTERN_CIRCULAR_5_R, 202.1711067521994, 64.32071138054334)
            Line((-2.529592015899754, 6.207522318391921), (0, 0))
            ThreePointArc((0, 0), (3.059553654138052, 0.09369647592148923), (6.11910730827611, -2.4e-16))
        make_face()
    fillet_5_of_pattern_circular_5_piece_7 = extrude(amount=21.757865522688395, mode=Mode.PRIVATE)
    fillet_5_of_pattern_circular_5_piece_7 = split(fillet_5_of_pattern_circular_5_piece_7, bisect_by=Plane(origin=(-36.76457397558818, -39.79677868537744, 5), z_dir=(0, 0, 1)), keep=Keep.TOP, mode=Mode.PRIVATE)
    fillet_5_of_pattern_circular_5_piece_7 = split(fillet_5_of_pattern_circular_5_piece_7, bisect_by=Plane(origin=(-36.63191010986293, -39.720185166789236, 5.897511373074565), z_dir=(-0.2961981327260199, -0.17101007166282992, -0.9396926207859104)), keep=Keep.TOP, mode=Mode.PRIVATE)
    add(fillet_5_of_pattern_circular_5_piece_7)
    with BuildSketch(Plane(origin=(-33.02438299353139, -37.541845025205276, 5), x_dir=(0.7898458337381034, -0.613305436896299, -1.909741752166655e-13), z_dir=(-1.7337e-13, 8.811e-14, -1))) as fillet_5_of_pattern_circular_5_piece_8_section:
        with BuildLine():
            CenterArc((6.7310180391030885, 9.981260704815686), FILLET_5_OF_PATTERN_CIRCULAR_5_R, 202.17110675219766, 64.32071138054334)
            Line((-2.5295920159005125, 6.207522318392188), (0, 0))
            ThreePointArc((0, 0), (3.059553654137562, 0.09369647592158793), (6.1191073082751695, 3.7e-16))
        make_face()
    fillet_5_of_pattern_circular_5_piece_8 = extrude(amount=5, mode=Mode.PRIVATE)
    fillet_5_of_pattern_circular_5_piece_8 = split(fillet_5_of_pattern_circular_5_piece_8, bisect_by=Plane(origin=(-31.53523949554797, -39.329065528676885, 4.21982477476597), z_dir=(0.2961981327260199, 0.17101007166282992, 0.9396926207859104)), keep=Keep.TOP, mode=Mode.PRIVATE)
    add(fillet_5_of_pattern_circular_5_piece_8)
    with BuildSketch(Plane(origin=(-33.02438299353139, -37.541845025205276, 5), x_dir=(0.7898458337381034, -0.613305436896299, -1.909741752166655e-13), z_dir=(-1.7337e-13, 8.811e-14, -1))) as fillet_5_of_pattern_circular_5_piece_9_section:
        with BuildLine():
            CenterArc((6.7310180391030885, 9.981260704815686), FILLET_5_OF_PATTERN_CIRCULAR_5_R, 202.17110675219766, 64.32071138054334)
            Line((-2.5295920159005125, 6.207522318392188), (0, 0))
            ThreePointArc((0, 0), (3.059553654137562, 0.09369647592158793), (6.1191073082751695, 3.7e-16))
        make_face()
    fillet_5_of_pattern_circular_5_piece_9 = extrude(amount=5, mode=Mode.PRIVATE)
    fillet_5_of_pattern_circular_5_piece_9 = split(fillet_5_of_pattern_circular_5_piece_9, bisect_by=Plane(origin=(-34.2140863369662, -39.5706703757415, -0.21270306824161445), z_dir=(0.2961981327260199, 0.17101007166282992, 0.9396926207859104)), keep=Keep.TOP, mode=Mode.PRIVATE)
    fillet_5_of_pattern_circular_5_piece_9 = split(fillet_5_of_pattern_circular_5_piece_9, bisect_by=Plane(origin=(-32.7330956733361, -38.71562001742734, 4.485760035687935), z_dir=(-0.2961981327260199, -0.17101007166282992, -0.9396926207859104)), keep=Keep.TOP, mode=Mode.PRIVATE)
    add(fillet_5_of_pattern_circular_5_piece_9)
    with BuildSketch(Plane(origin=(-49.02438299353208, -9.829032104102753, 0), x_dir=(-0.13621517176221587, 0.9906792755386528, 2.1397412113202394e-13), z_dir=(-1.563e-14, -2.1814e-13, 1))) as fillet_5_of_pattern_circular_5_piece_10_section:
        with BuildLine():
            CenterArc((6.731018039103715, 9.9812607048157), FILLET_5_OF_PATTERN_CIRCULAR_5_R, 202.1711067521994, 64.3207113805434)
            Line((-2.529592015899774, 6.207522318391925), (0, 0))
            ThreePointArc((0, 0), (3.05955365413807, 0.09369647592149644), (6.119107308276103, -1e-17))
        make_face()
    fillet_5_of_pattern_circular_5_piece_10 = extrude(amount=5, mode=Mode.PRIVATE)
    fillet_5_of_pattern_circular_5_piece_10 = split(fillet_5_of_pattern_circular_5_piece_10, bisect_by=Plane(origin=(-49.89525829502565, -8.989882388902053, 4.485760035688095), z_dir=(-0.2961981327260199, -0.17101007166282992, -0.9396926207859104)), keep=Keep.TOP, mode=Mode.PRIVATE)
    fillet_5_of_pattern_circular_5_piece_10 = split(fillet_5_of_pattern_circular_5_piece_10, bisect_by=Plane(origin=(-51.376248958655744, -9.844932747216212, -0.21270306824145635), z_dir=(0.2961981327260199, 0.17101007166282992, 0.9396926207859104)), keep=Keep.TOP, mode=Mode.PRIVATE)
    add(fillet_5_of_pattern_circular_5_piece_10)
    with BuildSketch(Plane(origin=(-49.02438299353208, -9.829032104102753, 0), x_dir=(-0.13621517176221587, 0.9906792755386528, 2.1397412113202394e-13), z_dir=(-1.563e-14, -2.1814e-13, 1))) as fillet_5_of_pattern_circular_5_piece_11_section:
        with BuildLine():
            CenterArc((6.731018039103715, 9.9812607048157), FILLET_5_OF_PATTERN_CIRCULAR_5_R, 202.1711067521994, 64.3207113805434)
            Line((-2.529592015899774, 6.207522318391925), (0, 0))
            ThreePointArc((0, 0), (3.05955365413807, 0.09369647592149644), (6.119107308276103, -1e-17))
        make_face()
    fillet_5_of_pattern_circular_5_piece_11 = extrude(amount=21.75786552268695, mode=Mode.PRIVATE)
    fillet_5_of_pattern_circular_5_piece_11 = split(fillet_5_of_pattern_circular_5_piece_11, bisect_by=Plane(origin=(-52.8473083181177, -11.940665679483903, 5), z_dir=(0, 0, 1)), keep=Keep.TOP, mode=Mode.PRIVATE)
    fillet_5_of_pattern_circular_5_piece_11 = split(fillet_5_of_pattern_circular_5_piece_11, bisect_by=Plane(origin=(-52.714644452392434, -11.864072160895685, 5.8975113730747015), z_dir=(-0.2961981327260199, -0.17101007166282992, -0.9396926207859104)), keep=Keep.TOP, mode=Mode.PRIVATE)
    add(fillet_5_of_pattern_circular_5_piece_11)
    with BuildSketch(Plane(origin=(-49.02438299353208, -9.829032104102753, 0), x_dir=(-0.13621517176221587, 0.9906792755386528, 2.1397412113202394e-13), z_dir=(-1.563e-14, -2.1814e-13, 1))) as fillet_5_of_pattern_circular_5_piece_12_section:
        with BuildLine():
            CenterArc((6.731018039103715, 9.9812607048157), FILLET_5_OF_PATTERN_CIRCULAR_5_R, 202.1711067521994, 64.3207113805434)
            Line((-2.529592015899774, 6.207522318391925), (0, 0))
            ThreePointArc((0, 0), (3.05955365413807, 0.09369647592149644), (6.119107308276103, -1e-17))
        make_face()
    fillet_5_of_pattern_circular_5_piece_12 = extrude(amount=5, mode=Mode.PRIVATE)
    fillet_5_of_pattern_circular_5_piece_12 = split(fillet_5_of_pattern_circular_5_piece_12, bisect_by=Plane(origin=(-49.827589602711555, -7.6457857532330955, 4.219824774766323), z_dir=(0.2961981327260199, 0.17101007166282992, 0.9396926207859104)), keep=Keep.TOP, mode=Mode.PRIVATE)
    add(fillet_5_of_pattern_circular_5_piece_12)

    # 抽壳1
    shell_1_openings = [part.faces().sort_by_distance(p)[0] for p in [
        (0, 0, 0),
        (-71.116705323, -41.059248962, 11.690177214),
        (0, 82.118497924, 11.690177214),
        (71.116705323, -41.059248962, 11.690177214),
    ]]
    offset(amount=SHELL_1_T, openings=shell_1_openings, kind=Kind.INTERSECTION)

    # 草图6 → 切除-拉伸3 (cut, through all)
    with BuildSketch(Plane(origin=(5.878e-14, 4.1387882053970415, -11.371227138233701), x_dir=(1, -1.66e-15, 4.56e-15), z_dir=(-4.85722573273506e-15, -0.34202014332566305, 0.9396926207859105))):
        with Locations(Location((1.36037e-12, 102.66562742220144, 0), (0, 0, 270))):
            Circle(SKETCH_6_R)
    cut_extrude_3 = extrude(amount=-CUT_EXTRUDE_3_DEPTH, mode=Mode.SUBTRACT)

    # 阵列(圆周)6: 切除-拉伸3 ×3 about axis
    pattern_circular_6_axis = Axis((0, 0, 13), (0, 0, -1))
    for i in range(1, PATTERN_CIRCULAR_6_COUNT):
        add(cut_extrude_3.rotate(pattern_circular_6_axis, i * 360 / PATTERN_CIRCULAR_6_COUNT), mode=Mode.SUBTRACT)

    # 草图7 → 切除-拉伸4 (cut, through all)
    with BuildSketch(Plane.XY.offset(11)):
        Circle(SKETCH_7_R)
    extrude(amount=-CUT_EXTRUDE_4_DEPTH, mode=Mode.SUBTRACT)


solid = part.part
